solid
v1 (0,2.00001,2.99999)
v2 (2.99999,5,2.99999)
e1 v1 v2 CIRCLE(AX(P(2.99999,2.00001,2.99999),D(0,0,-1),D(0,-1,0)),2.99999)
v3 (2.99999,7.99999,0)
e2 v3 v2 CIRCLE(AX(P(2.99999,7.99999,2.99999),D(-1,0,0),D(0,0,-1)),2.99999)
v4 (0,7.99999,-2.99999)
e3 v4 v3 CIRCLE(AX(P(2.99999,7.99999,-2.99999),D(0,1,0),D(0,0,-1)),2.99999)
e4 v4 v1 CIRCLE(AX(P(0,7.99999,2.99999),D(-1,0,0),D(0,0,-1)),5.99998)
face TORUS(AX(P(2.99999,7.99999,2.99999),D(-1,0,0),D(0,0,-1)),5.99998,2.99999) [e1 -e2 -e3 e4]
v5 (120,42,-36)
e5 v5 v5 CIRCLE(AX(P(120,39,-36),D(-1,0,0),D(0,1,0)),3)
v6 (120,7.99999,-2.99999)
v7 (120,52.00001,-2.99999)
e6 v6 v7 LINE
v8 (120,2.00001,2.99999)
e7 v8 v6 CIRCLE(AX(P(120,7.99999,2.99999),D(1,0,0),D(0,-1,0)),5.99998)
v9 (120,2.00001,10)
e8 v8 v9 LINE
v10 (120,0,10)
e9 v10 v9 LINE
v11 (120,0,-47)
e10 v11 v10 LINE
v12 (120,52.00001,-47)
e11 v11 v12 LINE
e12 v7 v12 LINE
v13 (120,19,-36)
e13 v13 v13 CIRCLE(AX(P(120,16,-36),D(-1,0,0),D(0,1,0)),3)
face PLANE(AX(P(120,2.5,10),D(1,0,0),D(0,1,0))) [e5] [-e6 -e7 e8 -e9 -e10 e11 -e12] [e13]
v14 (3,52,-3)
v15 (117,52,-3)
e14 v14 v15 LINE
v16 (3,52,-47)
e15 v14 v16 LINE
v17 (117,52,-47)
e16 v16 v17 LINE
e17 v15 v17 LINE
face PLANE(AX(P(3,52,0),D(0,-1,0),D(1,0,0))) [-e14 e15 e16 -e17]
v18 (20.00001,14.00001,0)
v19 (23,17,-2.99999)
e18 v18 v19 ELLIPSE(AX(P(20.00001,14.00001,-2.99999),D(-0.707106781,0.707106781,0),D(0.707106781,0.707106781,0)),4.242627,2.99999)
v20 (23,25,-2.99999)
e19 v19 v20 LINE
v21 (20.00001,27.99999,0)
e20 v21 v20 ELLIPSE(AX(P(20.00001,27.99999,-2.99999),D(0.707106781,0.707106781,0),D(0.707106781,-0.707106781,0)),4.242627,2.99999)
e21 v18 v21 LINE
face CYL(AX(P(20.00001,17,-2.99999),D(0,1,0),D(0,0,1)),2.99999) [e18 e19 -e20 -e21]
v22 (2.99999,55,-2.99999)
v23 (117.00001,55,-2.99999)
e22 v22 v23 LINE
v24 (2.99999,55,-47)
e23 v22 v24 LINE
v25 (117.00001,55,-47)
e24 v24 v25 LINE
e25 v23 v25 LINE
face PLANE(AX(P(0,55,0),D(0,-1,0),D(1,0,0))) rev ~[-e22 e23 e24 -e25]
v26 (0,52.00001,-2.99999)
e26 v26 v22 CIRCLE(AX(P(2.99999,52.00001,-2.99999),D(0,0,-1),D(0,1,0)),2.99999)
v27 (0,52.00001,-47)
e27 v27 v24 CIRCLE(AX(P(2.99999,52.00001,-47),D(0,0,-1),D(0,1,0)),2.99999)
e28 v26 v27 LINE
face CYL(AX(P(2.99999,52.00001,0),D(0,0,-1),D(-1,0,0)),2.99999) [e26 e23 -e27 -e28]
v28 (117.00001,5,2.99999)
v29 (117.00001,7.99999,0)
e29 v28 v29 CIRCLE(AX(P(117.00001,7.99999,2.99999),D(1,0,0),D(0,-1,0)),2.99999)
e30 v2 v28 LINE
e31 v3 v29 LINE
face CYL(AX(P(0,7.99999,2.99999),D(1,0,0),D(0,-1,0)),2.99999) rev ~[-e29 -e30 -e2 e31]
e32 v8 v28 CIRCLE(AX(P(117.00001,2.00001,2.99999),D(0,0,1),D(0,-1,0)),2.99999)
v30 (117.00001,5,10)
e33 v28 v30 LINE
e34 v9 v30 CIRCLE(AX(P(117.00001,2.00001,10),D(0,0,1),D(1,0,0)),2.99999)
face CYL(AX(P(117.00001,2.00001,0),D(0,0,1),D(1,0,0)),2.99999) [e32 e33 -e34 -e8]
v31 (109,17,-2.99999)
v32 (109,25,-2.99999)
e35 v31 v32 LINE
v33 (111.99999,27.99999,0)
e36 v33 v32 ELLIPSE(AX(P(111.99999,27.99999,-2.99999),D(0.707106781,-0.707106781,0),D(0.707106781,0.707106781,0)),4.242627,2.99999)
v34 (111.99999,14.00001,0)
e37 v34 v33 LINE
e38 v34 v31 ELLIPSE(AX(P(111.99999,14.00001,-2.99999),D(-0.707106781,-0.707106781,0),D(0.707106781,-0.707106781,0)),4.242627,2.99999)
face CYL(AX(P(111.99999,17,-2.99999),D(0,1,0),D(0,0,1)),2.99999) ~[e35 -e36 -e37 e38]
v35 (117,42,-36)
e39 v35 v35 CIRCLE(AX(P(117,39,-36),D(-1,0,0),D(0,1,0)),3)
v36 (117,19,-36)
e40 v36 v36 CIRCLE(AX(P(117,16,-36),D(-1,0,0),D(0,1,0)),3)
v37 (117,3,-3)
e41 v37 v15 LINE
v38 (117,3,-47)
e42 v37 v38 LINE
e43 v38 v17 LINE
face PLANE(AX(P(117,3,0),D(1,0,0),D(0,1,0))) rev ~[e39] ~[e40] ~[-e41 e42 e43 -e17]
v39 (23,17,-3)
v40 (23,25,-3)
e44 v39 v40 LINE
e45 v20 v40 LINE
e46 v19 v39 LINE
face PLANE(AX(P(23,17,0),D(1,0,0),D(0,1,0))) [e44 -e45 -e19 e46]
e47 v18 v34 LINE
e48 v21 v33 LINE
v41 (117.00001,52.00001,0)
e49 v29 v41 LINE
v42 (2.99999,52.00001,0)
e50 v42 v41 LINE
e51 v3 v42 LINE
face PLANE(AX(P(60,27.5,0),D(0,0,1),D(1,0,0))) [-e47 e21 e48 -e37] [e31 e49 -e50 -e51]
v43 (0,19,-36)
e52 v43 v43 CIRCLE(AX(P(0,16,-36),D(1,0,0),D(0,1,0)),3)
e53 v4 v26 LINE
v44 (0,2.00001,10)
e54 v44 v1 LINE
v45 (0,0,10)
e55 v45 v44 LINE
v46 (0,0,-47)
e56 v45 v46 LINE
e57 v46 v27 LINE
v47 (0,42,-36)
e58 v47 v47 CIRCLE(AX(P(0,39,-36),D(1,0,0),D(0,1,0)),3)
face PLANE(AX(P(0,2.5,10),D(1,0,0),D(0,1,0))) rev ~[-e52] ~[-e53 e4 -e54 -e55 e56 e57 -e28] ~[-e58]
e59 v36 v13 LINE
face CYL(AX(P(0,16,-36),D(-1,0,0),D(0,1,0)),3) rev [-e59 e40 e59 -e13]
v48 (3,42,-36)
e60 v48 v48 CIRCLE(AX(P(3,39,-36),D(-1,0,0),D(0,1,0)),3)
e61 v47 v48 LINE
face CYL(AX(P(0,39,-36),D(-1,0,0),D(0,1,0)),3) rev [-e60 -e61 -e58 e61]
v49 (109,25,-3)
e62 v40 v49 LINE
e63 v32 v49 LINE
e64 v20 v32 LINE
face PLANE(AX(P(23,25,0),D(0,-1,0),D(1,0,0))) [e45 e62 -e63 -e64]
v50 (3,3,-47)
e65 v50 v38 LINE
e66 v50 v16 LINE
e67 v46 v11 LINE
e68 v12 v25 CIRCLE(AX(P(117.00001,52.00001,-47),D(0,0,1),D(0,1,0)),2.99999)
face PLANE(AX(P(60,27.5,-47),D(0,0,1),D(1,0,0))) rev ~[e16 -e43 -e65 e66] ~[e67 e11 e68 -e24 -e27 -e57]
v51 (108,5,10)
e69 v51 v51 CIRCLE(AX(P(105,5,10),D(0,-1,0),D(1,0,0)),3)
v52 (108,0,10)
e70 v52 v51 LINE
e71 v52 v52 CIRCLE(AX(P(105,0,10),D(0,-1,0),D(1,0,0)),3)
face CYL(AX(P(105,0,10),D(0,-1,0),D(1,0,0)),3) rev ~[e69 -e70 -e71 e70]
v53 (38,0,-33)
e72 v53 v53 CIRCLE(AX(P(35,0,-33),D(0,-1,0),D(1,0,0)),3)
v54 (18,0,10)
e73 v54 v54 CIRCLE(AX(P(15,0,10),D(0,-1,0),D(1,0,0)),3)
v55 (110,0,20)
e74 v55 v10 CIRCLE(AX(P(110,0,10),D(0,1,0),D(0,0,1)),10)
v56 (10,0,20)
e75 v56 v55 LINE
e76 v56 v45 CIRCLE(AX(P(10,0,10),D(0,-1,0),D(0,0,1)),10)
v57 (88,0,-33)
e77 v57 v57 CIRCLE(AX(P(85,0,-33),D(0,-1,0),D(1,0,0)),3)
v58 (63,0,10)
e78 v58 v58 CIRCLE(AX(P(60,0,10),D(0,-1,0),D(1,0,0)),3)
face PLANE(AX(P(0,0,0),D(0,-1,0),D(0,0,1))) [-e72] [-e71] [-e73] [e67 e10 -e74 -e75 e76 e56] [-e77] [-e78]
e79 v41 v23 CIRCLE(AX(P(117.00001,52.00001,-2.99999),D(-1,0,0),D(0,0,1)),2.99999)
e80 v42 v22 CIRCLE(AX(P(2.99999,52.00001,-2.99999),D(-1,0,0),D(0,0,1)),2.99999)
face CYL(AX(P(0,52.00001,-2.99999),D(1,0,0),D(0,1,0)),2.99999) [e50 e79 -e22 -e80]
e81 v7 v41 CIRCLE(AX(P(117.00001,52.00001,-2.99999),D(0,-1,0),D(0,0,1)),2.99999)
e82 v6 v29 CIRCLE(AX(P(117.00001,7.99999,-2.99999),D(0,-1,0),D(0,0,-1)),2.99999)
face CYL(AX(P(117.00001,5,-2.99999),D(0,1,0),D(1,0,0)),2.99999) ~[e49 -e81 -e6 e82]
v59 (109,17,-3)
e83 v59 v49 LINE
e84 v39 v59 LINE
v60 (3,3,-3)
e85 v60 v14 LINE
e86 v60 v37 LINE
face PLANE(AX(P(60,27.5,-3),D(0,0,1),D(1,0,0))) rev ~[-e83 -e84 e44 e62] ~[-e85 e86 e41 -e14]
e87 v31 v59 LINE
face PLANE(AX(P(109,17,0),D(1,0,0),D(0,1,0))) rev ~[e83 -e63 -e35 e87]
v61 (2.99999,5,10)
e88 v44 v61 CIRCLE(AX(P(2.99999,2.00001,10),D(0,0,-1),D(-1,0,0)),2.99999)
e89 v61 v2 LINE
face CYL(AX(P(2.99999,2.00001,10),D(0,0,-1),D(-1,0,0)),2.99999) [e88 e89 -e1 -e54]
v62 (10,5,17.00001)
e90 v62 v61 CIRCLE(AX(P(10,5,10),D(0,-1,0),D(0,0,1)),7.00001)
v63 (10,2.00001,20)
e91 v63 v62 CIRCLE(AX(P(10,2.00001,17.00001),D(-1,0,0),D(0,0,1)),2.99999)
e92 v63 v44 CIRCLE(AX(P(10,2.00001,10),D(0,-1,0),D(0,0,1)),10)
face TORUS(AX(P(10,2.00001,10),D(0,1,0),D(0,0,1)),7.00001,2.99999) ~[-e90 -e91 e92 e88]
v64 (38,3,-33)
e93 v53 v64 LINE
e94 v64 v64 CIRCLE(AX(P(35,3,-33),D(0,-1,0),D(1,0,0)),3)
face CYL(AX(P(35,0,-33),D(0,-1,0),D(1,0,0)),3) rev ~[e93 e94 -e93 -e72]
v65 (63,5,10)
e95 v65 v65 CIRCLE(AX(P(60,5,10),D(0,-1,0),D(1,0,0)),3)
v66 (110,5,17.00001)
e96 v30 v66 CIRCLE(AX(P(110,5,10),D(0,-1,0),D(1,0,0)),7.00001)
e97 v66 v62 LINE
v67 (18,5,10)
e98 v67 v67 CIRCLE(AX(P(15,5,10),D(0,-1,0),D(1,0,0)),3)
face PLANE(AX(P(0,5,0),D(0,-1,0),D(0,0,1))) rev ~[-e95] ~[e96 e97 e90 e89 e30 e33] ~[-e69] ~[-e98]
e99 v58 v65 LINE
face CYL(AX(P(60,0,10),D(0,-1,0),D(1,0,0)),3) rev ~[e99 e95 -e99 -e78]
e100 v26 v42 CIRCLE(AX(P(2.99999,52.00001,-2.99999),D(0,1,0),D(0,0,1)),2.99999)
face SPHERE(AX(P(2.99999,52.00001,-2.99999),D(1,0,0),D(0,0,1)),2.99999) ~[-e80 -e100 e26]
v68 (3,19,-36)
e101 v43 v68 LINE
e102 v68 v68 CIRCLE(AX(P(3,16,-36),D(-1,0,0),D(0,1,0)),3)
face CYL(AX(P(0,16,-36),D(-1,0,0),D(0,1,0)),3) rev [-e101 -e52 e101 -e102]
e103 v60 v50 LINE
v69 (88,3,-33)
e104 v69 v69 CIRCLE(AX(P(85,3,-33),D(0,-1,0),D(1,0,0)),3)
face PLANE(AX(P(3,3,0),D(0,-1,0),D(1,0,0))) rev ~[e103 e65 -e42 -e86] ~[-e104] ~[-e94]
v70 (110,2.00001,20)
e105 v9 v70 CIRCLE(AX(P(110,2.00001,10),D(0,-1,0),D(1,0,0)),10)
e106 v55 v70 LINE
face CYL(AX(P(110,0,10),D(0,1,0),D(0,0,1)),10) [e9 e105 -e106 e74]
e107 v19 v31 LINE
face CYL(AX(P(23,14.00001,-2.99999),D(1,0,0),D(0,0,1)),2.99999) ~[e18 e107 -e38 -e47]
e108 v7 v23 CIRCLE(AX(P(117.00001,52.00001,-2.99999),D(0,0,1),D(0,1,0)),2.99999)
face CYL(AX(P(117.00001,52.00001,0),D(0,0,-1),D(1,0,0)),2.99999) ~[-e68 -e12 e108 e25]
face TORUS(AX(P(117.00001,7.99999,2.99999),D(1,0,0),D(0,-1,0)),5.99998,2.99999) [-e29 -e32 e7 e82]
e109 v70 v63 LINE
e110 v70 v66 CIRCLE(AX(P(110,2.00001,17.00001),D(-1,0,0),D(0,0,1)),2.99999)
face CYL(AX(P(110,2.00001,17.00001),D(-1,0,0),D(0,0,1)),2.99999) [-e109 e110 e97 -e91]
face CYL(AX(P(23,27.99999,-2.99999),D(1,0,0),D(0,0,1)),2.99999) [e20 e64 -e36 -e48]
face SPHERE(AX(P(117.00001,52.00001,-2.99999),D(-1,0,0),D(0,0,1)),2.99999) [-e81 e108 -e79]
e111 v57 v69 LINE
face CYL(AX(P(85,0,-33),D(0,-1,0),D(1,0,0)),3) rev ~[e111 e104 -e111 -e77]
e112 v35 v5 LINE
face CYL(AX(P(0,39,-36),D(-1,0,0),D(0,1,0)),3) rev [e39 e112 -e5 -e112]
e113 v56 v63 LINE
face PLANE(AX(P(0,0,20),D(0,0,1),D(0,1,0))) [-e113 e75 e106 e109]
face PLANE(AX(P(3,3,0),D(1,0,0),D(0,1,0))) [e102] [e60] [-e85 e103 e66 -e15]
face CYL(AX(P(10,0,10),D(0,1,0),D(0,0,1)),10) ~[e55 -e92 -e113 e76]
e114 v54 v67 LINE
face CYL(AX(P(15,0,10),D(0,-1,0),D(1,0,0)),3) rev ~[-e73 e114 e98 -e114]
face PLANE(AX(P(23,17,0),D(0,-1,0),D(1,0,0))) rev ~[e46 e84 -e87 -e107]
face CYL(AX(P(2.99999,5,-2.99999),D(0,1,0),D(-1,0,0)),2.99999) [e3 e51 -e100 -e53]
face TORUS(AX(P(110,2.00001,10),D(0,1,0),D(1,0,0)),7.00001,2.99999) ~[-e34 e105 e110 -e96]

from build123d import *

# Parameters (mm, degrees)
F0_W      = 114
F0_H      = 49
F0_W_2    = 86
F0_H_2    = 8
F1_DEPTH  = 3
F0_W_3    = 120
F0_H_3    = 55
F2_DEPTH  = 47
F3_R      = 3
F4_DEPTH  = 130
F5_R      = 3
F6_DEPTH  = 10
F7_W      = 5
F7_H      = 20
F8_DEPTH  = 120
F9_R      = 3
F10_DEPTH = 25
F11_R     = 10
F12_R     = 2.99999


# Not quite as in the source:
# - a fillet or chamfer is up to 0.001 mm smaller than in the source, because OpenCascade refuses the exact size


with BuildPart() as f1:
    # F0 (on Top) → F1 (new body)
    with BuildSketch(Plane.XY):
        with Locations((60, 27.5)):
            Rectangle(F0_W, F0_H)
        with Locations((66, 21)):
            Rectangle(F0_W_2, F0_H_2, mode=Mode.SUBTRACT)
    extrude(amount=-F1_DEPTH)

    # F0 (on Top) → F2 (join)
    with BuildSketch(Plane.XY):
        with Locations((60, 27.5)):
            Rectangle(F0_W_3, F0_H_3)
        with Locations((60, 27.5)):
            Rectangle(F0_W, F0_H, mode=Mode.SUBTRACT)
    extrude(amount=-F2_DEPTH)

    # F3 (on Right) → F4 (cut)
    with BuildSketch(Plane.YZ):
        with Locations((39, -36)):
            Circle(F3_R)
        with Locations((16, -36)):
            Circle(F3_R)
    extrude(amount=F4_DEPTH, mode=Mode.SUBTRACT)

    # F5 (on Front) → F6 (cut)
    with BuildSketch(Plane.XZ):
        with Locations((35, -33)):
            Circle(F5_R)
        with Locations((85, -33)):
            Circle(F5_R)
    extrude(amount=-F6_DEPTH, mode=Mode.SUBTRACT)

    # F7 (on Right) → F8 (join)
    with BuildSketch(Plane.YZ):
        with Locations((2.5, 10)):
            Rectangle(F7_W, F7_H)
    extrude(amount=F8_DEPTH)

    # F9 (on Front) → F10 (cut)
    with BuildSketch(Plane.XZ):
        with Locations((15, 10)):
            Circle(F9_R)
        with Locations((60, 10)):
            Circle(F9_R)
        with Locations((105, 10)):
            Circle(F9_R)
    extrude(amount=-F10_DEPTH, mode=Mode.SUBTRACT)

    # F11
    f11_edges = [f1.edges().sort_by_distance(p)[0] for p in [
        (0, 2.5, 20),
        (120, 2.5, 20),
    ]]
    fillet(f11_edges, radius=F11_R)

    # F12 (radius 3 in the source; OpenCascade refuses exactly that, so slightly less here)
    f12_edges = [f1.edges().sort_by_distance(p)[0] for p in [
        (66, 17, 0),
        (60, 55, 0),
        (120, 30, 0),
        (60, 5, 0),
        (0, 30, 0),
        (109, 21, 0),
        (66, 25, 0),
        (23, 21, 0),
        (120, 55, -23.5),
        (0, 55, -23.5),
        (2.928932, 5, 17.071068),
        (60, 5, 20),
        (117.071068, 5, 17.071068),
    ]]
    fillet(f12_edges, radius=F12_R)


solid = f1.part
